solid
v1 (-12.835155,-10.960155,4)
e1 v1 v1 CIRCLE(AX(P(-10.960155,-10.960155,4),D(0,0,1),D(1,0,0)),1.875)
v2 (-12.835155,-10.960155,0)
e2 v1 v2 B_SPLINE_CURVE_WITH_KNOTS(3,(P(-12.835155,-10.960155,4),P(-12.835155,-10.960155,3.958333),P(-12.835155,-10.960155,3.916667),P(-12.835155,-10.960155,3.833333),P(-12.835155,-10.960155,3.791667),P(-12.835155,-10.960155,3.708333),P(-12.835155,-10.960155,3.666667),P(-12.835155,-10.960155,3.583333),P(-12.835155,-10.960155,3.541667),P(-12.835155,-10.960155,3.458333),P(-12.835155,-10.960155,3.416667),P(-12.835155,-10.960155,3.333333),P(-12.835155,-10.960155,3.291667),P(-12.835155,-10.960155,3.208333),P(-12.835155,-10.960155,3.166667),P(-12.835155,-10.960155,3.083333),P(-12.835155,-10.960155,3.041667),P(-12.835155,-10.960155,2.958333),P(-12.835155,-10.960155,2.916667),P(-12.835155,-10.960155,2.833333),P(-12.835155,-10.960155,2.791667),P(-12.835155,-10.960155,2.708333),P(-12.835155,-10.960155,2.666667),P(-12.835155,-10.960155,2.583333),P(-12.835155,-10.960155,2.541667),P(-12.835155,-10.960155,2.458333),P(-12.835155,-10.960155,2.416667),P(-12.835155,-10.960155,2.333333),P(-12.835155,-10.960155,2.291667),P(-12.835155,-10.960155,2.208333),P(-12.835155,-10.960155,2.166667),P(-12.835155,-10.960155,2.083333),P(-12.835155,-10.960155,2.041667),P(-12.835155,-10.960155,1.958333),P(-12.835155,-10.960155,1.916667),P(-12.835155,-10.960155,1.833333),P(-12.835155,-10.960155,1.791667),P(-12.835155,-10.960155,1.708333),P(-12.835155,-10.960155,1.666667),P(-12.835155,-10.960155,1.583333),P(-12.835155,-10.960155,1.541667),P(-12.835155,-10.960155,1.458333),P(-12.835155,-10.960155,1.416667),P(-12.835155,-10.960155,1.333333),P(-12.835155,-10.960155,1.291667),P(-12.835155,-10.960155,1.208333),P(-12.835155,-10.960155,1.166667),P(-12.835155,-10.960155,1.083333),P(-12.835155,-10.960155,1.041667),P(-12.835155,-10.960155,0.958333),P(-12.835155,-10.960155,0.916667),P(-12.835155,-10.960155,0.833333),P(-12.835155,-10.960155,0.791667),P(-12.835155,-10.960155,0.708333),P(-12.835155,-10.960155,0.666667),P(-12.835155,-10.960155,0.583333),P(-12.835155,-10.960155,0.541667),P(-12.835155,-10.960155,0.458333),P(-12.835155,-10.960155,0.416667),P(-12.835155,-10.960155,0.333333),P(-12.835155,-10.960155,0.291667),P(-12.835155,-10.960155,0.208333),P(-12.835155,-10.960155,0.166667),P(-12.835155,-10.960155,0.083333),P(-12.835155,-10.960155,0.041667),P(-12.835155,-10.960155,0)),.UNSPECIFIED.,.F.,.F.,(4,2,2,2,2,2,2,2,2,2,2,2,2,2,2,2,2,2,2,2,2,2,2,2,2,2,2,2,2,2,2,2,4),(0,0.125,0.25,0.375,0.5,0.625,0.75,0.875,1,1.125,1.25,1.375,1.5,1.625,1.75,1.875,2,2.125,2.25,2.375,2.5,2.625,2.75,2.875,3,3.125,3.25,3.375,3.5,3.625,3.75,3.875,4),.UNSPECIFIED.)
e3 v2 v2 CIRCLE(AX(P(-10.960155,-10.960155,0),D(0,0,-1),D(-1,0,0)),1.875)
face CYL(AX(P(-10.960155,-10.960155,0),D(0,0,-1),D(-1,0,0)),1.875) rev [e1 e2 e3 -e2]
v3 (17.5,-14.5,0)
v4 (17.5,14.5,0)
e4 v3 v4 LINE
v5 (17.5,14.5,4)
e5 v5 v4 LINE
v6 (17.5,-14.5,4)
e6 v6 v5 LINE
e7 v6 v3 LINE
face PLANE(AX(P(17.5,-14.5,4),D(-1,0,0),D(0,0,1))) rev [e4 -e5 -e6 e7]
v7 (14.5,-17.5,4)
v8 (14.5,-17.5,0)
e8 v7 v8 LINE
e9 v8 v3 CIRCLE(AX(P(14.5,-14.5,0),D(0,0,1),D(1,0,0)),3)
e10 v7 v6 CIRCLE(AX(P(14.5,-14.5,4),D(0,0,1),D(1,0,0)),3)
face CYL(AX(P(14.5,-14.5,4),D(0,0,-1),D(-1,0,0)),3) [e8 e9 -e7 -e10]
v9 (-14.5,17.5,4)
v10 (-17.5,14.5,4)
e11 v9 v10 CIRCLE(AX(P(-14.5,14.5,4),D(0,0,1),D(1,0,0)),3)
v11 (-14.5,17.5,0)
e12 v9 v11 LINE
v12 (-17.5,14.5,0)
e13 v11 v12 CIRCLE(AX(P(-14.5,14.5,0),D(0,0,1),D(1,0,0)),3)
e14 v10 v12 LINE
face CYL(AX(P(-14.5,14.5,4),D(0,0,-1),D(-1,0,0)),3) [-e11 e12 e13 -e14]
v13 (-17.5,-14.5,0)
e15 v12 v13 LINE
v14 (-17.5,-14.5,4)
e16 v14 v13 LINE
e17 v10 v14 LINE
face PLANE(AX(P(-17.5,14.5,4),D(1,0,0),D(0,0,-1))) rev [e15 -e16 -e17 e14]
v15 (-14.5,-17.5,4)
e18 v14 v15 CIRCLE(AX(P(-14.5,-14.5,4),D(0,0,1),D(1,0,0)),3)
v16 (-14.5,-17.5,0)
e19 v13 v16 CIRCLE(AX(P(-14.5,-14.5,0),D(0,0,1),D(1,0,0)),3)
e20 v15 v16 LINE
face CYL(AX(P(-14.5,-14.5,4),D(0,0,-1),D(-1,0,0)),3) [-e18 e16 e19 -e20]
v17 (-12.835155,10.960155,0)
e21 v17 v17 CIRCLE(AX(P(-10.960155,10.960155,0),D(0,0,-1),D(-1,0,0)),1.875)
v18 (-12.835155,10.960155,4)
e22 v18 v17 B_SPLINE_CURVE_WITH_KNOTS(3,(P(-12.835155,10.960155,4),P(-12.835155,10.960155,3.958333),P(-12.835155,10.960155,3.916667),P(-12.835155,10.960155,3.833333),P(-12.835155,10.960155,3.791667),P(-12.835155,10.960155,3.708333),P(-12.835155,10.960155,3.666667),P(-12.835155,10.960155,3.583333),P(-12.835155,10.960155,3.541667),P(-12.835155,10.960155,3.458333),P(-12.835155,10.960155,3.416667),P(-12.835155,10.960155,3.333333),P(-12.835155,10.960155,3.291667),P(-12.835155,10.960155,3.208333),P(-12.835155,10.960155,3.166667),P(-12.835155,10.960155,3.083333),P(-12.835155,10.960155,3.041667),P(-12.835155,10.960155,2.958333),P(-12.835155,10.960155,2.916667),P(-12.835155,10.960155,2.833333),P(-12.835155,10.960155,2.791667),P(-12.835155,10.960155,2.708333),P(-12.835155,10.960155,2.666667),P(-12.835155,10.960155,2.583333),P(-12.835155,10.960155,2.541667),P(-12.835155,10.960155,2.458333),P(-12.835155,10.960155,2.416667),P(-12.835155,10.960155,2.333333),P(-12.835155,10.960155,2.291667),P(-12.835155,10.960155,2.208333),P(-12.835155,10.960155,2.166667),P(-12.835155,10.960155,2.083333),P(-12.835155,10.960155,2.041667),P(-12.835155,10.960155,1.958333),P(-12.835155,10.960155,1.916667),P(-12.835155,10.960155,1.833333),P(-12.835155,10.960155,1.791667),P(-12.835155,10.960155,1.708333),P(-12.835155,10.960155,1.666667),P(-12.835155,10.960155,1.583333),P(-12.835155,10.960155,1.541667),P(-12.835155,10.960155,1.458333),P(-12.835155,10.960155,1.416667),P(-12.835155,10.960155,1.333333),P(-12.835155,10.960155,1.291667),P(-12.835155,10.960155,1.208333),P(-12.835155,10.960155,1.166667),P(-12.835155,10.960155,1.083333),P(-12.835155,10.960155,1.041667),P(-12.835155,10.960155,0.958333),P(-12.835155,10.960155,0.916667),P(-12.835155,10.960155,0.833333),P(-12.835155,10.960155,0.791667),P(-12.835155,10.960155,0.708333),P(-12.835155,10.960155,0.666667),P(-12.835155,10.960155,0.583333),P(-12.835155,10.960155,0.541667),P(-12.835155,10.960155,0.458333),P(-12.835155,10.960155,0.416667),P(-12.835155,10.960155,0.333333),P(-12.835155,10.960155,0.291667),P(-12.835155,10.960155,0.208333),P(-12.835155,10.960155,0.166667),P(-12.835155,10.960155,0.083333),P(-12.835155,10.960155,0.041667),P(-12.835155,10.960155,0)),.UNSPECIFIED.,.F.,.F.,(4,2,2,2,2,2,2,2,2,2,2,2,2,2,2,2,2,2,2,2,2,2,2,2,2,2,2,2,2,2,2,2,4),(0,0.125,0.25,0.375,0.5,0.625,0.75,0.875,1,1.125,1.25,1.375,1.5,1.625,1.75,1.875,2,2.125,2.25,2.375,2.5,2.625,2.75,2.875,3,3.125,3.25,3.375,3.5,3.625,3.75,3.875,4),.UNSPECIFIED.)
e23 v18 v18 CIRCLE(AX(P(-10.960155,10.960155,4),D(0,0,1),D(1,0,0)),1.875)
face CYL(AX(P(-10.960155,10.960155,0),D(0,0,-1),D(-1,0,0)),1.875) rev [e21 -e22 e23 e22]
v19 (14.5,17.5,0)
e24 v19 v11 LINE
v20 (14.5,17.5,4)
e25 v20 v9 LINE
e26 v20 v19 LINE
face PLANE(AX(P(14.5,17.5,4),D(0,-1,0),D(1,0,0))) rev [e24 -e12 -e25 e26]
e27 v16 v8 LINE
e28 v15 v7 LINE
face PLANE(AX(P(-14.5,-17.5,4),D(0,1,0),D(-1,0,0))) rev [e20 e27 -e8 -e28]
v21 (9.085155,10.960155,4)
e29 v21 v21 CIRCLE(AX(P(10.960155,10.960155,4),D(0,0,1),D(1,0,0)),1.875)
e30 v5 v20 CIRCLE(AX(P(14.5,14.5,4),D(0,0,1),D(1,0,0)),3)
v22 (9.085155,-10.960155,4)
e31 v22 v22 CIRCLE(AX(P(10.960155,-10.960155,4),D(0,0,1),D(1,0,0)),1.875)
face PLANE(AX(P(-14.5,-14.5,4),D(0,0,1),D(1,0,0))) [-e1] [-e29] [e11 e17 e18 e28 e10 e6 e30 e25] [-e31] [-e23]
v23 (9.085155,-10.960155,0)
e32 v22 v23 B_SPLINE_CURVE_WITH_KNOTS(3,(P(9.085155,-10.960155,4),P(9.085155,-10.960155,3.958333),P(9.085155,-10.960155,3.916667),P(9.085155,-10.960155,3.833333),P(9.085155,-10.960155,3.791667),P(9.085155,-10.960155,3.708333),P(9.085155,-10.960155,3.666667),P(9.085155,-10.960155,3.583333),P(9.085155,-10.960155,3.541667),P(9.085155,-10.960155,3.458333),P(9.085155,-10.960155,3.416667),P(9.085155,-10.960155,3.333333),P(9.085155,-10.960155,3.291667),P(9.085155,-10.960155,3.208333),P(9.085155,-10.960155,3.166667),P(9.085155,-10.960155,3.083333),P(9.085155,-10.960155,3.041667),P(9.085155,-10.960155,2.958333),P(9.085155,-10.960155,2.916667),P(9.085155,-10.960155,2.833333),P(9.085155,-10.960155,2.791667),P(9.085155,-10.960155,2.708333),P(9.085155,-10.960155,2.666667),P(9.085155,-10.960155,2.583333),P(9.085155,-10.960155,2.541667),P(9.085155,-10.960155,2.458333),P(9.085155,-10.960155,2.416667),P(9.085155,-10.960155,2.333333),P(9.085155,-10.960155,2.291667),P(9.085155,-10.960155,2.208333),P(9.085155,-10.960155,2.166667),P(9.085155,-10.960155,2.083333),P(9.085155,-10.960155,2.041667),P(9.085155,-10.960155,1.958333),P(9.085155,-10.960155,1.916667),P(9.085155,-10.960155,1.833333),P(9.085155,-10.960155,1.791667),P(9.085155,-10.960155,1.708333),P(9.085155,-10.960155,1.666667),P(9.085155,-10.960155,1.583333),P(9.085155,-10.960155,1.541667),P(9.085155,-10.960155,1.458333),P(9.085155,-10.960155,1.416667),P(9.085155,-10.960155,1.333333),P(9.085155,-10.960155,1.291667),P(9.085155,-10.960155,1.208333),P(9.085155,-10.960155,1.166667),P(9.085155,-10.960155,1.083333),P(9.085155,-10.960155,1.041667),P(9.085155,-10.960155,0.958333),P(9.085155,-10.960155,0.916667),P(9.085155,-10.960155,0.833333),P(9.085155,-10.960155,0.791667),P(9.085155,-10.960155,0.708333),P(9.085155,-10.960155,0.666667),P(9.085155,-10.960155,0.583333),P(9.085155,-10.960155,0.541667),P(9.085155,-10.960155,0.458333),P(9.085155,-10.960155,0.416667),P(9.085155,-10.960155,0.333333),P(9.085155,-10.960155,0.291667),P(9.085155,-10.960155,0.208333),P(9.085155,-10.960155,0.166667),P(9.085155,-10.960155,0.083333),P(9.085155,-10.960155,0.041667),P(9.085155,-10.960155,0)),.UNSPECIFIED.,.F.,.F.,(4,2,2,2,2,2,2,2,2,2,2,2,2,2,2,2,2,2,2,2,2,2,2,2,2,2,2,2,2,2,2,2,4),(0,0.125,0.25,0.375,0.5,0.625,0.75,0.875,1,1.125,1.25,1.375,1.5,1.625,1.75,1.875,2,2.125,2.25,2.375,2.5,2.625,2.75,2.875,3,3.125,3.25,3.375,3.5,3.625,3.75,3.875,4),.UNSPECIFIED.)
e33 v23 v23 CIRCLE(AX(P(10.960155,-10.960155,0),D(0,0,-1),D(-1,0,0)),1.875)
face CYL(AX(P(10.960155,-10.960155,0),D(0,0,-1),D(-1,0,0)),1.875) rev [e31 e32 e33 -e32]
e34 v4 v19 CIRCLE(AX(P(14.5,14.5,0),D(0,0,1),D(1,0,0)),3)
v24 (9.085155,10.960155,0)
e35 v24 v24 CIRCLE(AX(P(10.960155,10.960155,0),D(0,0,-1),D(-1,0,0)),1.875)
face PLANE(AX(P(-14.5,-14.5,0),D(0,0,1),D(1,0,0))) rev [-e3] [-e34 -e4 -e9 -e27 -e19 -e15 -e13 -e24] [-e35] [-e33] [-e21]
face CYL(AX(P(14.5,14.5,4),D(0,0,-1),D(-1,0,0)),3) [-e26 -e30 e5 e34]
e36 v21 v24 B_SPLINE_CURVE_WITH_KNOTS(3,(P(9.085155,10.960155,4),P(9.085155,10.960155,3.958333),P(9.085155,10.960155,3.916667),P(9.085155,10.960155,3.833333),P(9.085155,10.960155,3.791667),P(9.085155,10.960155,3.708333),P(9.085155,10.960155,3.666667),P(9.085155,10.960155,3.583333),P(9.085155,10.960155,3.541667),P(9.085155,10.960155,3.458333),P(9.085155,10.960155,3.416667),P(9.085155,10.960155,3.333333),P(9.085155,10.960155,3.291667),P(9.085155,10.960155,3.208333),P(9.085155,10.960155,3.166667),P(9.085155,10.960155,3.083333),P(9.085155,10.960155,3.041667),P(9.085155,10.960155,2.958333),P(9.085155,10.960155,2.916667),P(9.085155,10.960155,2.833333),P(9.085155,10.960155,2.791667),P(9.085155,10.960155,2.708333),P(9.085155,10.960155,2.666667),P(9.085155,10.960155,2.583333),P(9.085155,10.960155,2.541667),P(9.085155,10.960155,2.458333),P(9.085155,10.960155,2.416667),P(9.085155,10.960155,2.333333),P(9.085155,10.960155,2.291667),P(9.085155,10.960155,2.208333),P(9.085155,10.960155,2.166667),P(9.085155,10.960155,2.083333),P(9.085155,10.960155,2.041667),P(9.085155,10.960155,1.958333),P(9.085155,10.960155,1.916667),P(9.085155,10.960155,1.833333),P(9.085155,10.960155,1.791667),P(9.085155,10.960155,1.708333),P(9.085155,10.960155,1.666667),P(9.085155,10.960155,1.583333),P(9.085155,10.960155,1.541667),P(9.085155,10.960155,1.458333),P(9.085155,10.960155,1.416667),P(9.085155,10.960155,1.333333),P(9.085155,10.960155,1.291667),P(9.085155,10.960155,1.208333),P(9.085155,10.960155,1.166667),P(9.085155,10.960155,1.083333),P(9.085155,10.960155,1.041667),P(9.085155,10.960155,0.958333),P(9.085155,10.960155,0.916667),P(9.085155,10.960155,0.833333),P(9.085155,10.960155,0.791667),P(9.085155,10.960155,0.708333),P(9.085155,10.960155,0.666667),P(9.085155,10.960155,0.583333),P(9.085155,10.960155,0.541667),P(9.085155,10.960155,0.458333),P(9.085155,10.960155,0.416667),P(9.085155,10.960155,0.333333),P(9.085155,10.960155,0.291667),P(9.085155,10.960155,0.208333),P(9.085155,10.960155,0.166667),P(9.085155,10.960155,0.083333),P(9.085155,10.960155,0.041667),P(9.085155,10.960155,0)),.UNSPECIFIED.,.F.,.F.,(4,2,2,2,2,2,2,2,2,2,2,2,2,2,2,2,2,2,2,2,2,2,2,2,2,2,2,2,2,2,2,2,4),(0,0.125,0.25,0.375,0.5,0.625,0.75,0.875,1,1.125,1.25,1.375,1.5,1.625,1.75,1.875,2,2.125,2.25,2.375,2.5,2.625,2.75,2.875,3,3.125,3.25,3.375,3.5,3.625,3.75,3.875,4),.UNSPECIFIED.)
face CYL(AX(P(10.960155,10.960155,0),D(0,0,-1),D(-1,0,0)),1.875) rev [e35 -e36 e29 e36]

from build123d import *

# Parameters (mm, degrees)
SM_BASE_FLANGE_1_DEPTH = 4
M4X0_251_D             = 3.75
M4X0_251_DEPTH         = 9.25
M4X0_251_TIP           = 1.126613661


# Sheet-metal steps are written as plain solids
with BuildPart() as part:
    # Sketch 1 → Базовая кромка1 (new body)
    with BuildSketch(Plane.XY):
        with BuildLine():
            Line((-14.5, -17.5), (14.5, -17.5))
            ThreePointArc((14.5, -17.5), (16.621320344, -16.621320344), (17.5, -14.5))
            Line((17.5, -14.5), (17.5, 14.5))
            ThreePointArc((17.5, 14.5), (16.621320344, 16.621320344), (14.5, 17.5))
            Line((14.5, 17.5), (-14.5, 17.5))
            ThreePointArc((-14.5, 17.5), (-16.621320344, 16.621320344), (-17.5, 14.5))
            Line((-17.5, 14.5), (-17.5, -14.5))
            ThreePointArc((-17.5, -14.5), (-16.621320344, -16.621320344), (-14.5, -17.5))
        make_face()
    extrude(amount=SM_BASE_FLANGE_1_DEPTH)

    # Отверстие обработанное метчиком M4x0.251
    with Locations(Plane(origin=(0, 0, 0), x_dir=(-1, 0, 0), z_dir=(0, 0, -1))):
        with Locations((-10.960155108, 10.960155108), (10.960155108, 10.960155108), (10.960155108, -10.960155108), (-10.960155108, -10.960155108)):
            Hole(M4X0_251_D / 2, depth=M4X0_251_DEPTH)
            with Locations((0, 0, -(M4X0_251_DEPTH + M4X0_251_TIP / 2))):  # 118° drill point
                Cone(0, M4X0_251_D / 2, M4X0_251_TIP, mode=Mode.SUBTRACT)


solid = part.part
